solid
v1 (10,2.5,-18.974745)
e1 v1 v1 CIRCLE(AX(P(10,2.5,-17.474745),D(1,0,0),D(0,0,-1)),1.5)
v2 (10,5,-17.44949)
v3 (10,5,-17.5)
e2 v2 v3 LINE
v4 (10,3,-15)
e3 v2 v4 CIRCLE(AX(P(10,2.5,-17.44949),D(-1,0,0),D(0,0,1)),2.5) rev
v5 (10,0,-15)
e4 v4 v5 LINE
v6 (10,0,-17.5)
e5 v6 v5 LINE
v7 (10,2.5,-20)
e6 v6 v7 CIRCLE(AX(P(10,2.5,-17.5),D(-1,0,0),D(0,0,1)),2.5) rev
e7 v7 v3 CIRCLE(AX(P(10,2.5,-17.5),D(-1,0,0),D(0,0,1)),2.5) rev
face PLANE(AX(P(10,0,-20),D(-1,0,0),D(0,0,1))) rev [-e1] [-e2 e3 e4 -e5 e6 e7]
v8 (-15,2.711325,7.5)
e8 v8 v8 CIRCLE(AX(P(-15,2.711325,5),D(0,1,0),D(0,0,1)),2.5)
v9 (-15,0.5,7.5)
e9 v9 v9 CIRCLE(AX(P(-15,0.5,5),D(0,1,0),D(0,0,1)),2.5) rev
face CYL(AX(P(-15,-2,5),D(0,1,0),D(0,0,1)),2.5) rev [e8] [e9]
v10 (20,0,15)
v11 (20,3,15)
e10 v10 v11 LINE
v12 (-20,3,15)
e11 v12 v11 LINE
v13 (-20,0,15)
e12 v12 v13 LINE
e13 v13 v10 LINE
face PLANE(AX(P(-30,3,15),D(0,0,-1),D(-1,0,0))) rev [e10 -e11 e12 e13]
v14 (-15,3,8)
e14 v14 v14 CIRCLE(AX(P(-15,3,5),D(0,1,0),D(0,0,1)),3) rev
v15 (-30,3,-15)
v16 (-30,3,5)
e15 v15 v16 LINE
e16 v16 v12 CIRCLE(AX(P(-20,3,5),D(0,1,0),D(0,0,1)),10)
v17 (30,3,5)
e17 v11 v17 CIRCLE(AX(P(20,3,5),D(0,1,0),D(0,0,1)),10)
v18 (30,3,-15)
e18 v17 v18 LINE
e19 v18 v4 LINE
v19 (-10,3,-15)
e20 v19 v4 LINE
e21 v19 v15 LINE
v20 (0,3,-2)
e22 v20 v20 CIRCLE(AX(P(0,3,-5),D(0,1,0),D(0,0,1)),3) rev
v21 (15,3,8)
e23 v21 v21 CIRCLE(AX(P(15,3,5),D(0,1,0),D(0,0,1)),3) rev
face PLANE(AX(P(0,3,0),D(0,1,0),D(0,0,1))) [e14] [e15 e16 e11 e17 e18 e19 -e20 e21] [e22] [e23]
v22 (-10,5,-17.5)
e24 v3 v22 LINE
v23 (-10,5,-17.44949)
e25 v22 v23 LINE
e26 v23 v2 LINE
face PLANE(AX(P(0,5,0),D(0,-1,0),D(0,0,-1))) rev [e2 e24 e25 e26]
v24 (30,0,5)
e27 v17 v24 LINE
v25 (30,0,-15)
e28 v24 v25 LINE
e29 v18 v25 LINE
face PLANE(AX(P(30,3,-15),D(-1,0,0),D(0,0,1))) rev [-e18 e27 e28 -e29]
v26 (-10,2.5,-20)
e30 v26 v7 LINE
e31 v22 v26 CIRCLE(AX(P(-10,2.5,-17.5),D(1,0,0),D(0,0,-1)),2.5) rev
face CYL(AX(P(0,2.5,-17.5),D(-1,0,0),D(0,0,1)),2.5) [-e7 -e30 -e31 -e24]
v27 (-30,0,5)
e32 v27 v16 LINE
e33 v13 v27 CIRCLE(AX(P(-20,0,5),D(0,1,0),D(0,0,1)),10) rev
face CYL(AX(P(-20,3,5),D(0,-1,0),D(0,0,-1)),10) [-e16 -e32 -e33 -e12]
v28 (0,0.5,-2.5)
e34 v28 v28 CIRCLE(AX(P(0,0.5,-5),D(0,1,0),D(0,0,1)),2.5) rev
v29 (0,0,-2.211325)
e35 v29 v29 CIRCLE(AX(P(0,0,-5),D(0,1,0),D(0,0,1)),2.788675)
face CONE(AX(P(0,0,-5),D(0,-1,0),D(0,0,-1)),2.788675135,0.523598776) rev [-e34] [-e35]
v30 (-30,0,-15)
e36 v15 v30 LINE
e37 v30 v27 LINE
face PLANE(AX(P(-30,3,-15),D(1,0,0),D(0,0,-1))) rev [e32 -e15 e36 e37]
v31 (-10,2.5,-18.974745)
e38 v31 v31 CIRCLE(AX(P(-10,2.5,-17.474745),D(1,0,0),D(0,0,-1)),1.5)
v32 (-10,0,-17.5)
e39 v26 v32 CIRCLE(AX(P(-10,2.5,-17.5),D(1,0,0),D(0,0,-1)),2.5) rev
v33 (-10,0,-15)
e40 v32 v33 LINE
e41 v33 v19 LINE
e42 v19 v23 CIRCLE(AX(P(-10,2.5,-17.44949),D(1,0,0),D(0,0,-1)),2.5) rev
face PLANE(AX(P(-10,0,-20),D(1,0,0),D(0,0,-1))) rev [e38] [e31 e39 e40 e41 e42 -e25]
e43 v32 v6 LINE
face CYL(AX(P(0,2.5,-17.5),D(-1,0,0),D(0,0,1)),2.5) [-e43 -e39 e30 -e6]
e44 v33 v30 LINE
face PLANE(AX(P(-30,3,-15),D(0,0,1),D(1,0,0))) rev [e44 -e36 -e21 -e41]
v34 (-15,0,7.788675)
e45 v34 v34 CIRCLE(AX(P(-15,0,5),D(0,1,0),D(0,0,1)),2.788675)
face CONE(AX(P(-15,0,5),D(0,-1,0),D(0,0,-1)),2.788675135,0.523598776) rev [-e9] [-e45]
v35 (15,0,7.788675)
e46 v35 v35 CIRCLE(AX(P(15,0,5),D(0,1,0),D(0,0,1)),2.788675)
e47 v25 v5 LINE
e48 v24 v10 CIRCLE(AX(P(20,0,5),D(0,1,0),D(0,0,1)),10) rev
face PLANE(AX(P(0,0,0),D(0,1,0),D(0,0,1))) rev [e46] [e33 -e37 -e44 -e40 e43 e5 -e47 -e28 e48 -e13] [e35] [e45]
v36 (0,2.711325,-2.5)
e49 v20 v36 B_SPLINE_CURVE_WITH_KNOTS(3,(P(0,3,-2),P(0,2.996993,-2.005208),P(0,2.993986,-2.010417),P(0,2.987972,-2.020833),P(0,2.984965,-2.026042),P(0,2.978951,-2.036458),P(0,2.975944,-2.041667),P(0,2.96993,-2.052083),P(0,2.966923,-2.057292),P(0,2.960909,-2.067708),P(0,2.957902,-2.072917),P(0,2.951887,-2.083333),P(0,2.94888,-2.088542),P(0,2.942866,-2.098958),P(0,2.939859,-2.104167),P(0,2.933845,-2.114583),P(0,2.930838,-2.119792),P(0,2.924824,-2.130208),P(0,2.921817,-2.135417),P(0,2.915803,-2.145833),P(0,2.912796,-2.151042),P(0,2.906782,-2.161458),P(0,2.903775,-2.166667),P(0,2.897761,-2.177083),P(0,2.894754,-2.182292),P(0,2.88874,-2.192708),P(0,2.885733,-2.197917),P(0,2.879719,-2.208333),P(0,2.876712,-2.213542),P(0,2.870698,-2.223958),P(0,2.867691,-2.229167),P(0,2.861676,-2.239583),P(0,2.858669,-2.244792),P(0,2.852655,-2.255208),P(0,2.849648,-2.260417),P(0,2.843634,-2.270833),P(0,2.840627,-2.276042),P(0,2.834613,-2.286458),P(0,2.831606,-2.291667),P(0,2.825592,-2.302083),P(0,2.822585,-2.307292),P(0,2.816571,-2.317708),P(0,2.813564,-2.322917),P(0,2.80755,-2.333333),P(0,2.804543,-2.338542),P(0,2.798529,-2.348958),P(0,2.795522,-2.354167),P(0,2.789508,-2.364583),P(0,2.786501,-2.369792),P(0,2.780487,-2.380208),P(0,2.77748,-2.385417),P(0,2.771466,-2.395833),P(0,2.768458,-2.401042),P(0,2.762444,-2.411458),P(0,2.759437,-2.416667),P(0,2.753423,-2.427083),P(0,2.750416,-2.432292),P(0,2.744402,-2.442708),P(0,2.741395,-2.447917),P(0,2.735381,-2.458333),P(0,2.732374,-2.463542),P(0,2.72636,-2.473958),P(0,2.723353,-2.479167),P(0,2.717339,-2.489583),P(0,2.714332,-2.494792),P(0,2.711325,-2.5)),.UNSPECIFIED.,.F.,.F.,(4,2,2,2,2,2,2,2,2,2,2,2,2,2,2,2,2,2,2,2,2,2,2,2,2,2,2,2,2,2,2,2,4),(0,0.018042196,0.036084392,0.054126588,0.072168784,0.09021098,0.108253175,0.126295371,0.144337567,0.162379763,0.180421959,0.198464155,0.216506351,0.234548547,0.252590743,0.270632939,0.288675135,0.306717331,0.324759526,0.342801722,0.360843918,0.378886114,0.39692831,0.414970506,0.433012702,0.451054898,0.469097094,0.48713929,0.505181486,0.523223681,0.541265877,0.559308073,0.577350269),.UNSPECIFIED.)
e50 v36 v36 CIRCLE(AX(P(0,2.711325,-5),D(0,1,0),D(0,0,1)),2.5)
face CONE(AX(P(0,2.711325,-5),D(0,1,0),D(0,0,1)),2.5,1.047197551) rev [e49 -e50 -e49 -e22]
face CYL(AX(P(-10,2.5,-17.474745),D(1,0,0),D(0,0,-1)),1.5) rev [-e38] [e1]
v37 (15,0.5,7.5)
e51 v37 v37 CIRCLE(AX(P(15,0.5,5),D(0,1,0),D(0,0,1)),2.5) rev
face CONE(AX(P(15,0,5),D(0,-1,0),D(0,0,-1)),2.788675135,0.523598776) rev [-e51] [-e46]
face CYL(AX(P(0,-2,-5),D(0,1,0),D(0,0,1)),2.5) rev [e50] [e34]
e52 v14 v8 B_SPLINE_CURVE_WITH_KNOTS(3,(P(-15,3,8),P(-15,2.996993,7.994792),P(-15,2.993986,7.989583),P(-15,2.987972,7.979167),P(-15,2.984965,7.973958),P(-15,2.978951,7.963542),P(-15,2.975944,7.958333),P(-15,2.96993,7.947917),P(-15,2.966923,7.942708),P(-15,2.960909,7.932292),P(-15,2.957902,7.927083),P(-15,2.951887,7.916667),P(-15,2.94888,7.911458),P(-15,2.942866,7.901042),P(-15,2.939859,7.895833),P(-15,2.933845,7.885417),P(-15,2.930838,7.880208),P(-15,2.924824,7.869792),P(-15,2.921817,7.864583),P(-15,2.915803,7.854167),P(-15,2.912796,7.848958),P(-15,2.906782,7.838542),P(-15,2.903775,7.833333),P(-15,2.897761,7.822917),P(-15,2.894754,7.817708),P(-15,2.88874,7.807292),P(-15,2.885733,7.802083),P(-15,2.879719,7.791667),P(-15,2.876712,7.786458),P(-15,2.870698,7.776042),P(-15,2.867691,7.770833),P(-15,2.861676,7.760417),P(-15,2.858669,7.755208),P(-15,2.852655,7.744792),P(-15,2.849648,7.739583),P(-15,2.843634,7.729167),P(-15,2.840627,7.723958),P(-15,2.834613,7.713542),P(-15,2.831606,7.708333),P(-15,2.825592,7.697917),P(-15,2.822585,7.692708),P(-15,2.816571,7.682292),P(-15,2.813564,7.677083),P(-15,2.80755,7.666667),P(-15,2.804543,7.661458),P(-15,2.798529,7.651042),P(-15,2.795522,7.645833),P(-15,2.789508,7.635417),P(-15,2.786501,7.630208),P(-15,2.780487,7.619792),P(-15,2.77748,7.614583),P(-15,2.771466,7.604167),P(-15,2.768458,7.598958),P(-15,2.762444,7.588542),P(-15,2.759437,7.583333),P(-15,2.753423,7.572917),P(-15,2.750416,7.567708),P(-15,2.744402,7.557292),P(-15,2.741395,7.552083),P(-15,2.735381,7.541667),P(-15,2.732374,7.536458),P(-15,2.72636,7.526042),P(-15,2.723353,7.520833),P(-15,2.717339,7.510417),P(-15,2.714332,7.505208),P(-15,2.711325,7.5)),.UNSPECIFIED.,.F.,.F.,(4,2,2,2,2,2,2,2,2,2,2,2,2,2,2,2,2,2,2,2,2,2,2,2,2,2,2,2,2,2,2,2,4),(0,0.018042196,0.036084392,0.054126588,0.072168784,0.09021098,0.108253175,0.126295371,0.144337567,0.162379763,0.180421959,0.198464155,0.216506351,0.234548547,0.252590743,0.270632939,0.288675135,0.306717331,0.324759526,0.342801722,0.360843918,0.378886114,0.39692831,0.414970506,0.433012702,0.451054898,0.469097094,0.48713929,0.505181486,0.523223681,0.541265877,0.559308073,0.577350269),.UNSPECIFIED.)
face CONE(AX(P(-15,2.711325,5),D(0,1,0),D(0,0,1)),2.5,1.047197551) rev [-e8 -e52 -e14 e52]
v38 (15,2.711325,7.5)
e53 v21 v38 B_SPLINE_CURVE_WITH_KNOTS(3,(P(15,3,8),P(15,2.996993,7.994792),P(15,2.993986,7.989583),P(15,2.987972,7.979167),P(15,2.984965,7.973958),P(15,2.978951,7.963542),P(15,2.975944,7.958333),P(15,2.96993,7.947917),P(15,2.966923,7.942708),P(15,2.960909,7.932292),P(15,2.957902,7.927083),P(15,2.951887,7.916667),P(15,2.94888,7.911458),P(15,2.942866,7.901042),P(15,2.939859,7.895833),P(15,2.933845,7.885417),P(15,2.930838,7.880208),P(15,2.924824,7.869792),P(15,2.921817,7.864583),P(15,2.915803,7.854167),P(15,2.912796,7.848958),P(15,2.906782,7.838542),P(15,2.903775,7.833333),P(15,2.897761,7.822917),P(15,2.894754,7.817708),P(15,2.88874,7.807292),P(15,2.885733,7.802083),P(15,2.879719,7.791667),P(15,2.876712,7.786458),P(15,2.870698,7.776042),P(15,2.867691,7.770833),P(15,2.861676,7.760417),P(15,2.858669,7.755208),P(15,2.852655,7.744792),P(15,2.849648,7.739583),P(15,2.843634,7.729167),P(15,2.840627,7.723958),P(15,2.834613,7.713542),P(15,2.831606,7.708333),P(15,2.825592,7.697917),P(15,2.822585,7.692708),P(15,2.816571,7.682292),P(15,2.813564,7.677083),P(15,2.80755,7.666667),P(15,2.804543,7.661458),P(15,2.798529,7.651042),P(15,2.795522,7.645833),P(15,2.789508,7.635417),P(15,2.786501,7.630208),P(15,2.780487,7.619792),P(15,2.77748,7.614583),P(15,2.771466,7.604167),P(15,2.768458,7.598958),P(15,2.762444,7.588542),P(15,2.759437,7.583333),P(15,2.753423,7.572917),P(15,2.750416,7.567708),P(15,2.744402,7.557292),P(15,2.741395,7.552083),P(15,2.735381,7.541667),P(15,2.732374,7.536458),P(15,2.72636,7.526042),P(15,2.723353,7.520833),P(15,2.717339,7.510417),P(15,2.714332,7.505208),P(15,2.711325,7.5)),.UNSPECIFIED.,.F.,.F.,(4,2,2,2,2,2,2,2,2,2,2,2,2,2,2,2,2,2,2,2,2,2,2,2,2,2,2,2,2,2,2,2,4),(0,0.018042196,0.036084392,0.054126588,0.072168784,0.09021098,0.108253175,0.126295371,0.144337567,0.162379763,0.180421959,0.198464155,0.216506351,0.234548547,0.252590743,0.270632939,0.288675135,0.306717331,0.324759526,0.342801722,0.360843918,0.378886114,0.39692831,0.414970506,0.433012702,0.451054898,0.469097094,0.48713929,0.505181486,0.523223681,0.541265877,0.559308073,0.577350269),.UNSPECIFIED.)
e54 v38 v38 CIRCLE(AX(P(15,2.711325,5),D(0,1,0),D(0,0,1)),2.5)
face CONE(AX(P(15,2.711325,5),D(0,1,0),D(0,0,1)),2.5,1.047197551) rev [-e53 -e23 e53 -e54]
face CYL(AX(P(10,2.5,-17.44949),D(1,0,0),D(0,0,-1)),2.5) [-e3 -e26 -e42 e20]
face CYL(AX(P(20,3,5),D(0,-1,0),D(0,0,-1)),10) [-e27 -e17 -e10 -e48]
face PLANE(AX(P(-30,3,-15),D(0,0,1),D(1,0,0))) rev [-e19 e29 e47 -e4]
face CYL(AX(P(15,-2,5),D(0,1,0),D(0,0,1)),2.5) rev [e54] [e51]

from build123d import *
from OCP.BRepFilletAPI import BRepFilletAPI_MakeChamfer

# Parameters (mm, degrees)
SZKIC1_W                    = 60
SZKIC1_H                    = 30
DODANIE_WYCI_GNI_CIE1_DEPTH = 3
SZKIC2_R                    = 2.5
WYTNIJ_WYCI_GNI_CIE1_DEPTH  = 5
ZAOKR_GLENIE1_R             = 10
SZKIC3_W                    = 20
SZKIC3_H                    = 3
DODANIE_WYCI_GNI_CIE2_DEPTH = 5
SZKIC4_W                    = 20
SZKIC4_H                    = 5
DODANIE_WYCI_GNI_CIE3_DEPTH = 2
ZAOKR_GLENIE2_R             = 2.5
SZKIC5_R                    = 1.5
WYTNIJ_WYCI_GNI_CIE2_DEPTH  = 20
SFAZOWANIE1_SIZE            = 0.5
SFAZOWANIE1_SIZE2           = 0.288675135
SFAZOWANIE2_SIZE            = 0.5
SFAZOWANIE2_SIZE2           = 0.288675135


with BuildPart() as part:
    # Szkic1 → Dodanie-wyciągnięcie1 (new body)
    with BuildSketch(Plane(origin=(0, 0, 0), x_dir=(1, 0, 0), z_dir=(0, 1, 0))):
        Rectangle(SZKIC1_W, SZKIC1_H)
    extrude(amount=DODANIE_WYCI_GNI_CIE1_DEPTH)

    # Szkic2 → Wytnij-wyciągnięcie1 (cut)
    with BuildSketch(Plane(origin=(0, 3, 0), x_dir=(1, 0, 0), z_dir=(0, 1, 0))):
        with Locations(Location((-15, -5, 0), (0, 0, 270))):
            Circle(SZKIC2_R)
        with Locations(Location((15, -5, 0), (0, 0, 270))):
            Circle(SZKIC2_R)
        with Locations(Location((0, 5, 0), (0, 0, 270))):
            Circle(SZKIC2_R)
    extrude(amount=-WYTNIJ_WYCI_GNI_CIE1_DEPTH, mode=Mode.SUBTRACT)

    # Zaokrąglenie1
    zaokr_glenie1_edges = [part.edges().sort_by_distance(p)[0] for p in [
        (30, 1.5, 15),
        (-30, 1.5, 15),
    ]]
    fillet(zaokr_glenie1_edges, radius=ZAOKR_GLENIE1_R)

    # Szkic3 → Dodanie-wyciągnięcie2 (add)
    with BuildSketch(Plane(origin=(0, 0, -15), x_dir=(-1, 0, 0), z_dir=(0, 0, -1))):
        with Locations((0, 1.5)):
            Rectangle(SZKIC3_W, SZKIC3_H)
    extrude(amount=DODANIE_WYCI_GNI_CIE2_DEPTH)

    # Szkic4 → Dodanie-wyciągnięcie3 (add)
    with BuildSketch(Plane(origin=(0, 3, 0), x_dir=(1, 0, 0), z_dir=(0, 1, 0))):
        with Locations((0, 17.5)):
            Rectangle(SZKIC4_W, SZKIC4_H)
    extrude(amount=DODANIE_WYCI_GNI_CIE3_DEPTH)

    # Zaokrąglenie2
    # the kernel refuses this fillet: 2.5 mm, written as the material it takes off along each edge
    with BuildSketch(Plane(origin=(16.25, 0, -20), x_dir=(0, 1, 0), z_dir=(-1, 0, 0)), Plane(origin=(16.25, 5, -20), x_dir=(0, 0, 1), z_dir=(-1, 0, 0))) as zaokr_glenie2_piece_1:
        with BuildLine():
            CenterArc((ZAOKR_GLENIE2_R, -ZAOKR_GLENIE2_R), ZAOKR_GLENIE2_R, 90, 90)
            Line((0, -ZAOKR_GLENIE2_R), (-ZAOKR_GLENIE2_R * 0.02, -ZAOKR_GLENIE2_R))
            Line((-ZAOKR_GLENIE2_R * 0.02, -ZAOKR_GLENIE2_R), (-ZAOKR_GLENIE2_R * 0.02, ZAOKR_GLENIE2_R * 0.02))
            Line((-ZAOKR_GLENIE2_R * 0.02, ZAOKR_GLENIE2_R * 0.02), (ZAOKR_GLENIE2_R, ZAOKR_GLENIE2_R * 0.02))
            Line((ZAOKR_GLENIE2_R, ZAOKR_GLENIE2_R * 0.02), (ZAOKR_GLENIE2_R, 0))
        make_face()
    extrude(amount=32.5, mode=Mode.SUBTRACT)
    with BuildSketch(Plane(origin=(-16.123724357, 5, -15), x_dir=(0, -1.0, -1.666222715356868e-12), z_dir=(1, 0, 0))) as zaokr_glenie2_piece_2:
        with BuildLine():
            CenterArc((2.5, 2.449489743), ZAOKR_GLENIE2_R, 180, 78.463040967)
            Line((0, 2.449489743), (-0.05, 2.449489743))
            Line((-0.05, 2.449489743), (-0.05, 0))
            Line((-0.05, 0), (0, -0.05))
            ThreePointArc((0, -0.05), (1, -0.05), (1.99, -0.048989795))
            Line((1.99, -0.048989795), (2, 0))
        make_face()
    extrude(amount=32.247448714, mode=Mode.SUBTRACT)

    # Szkic5 → Wytnij-wyciągnięcie2 (cut)
    with BuildSketch(Plane(origin=(10, 0, 0), x_dir=(0, 0, -1), z_dir=(1, 0, 0))):
        with Locations((17.474744871, 2.5)):
            Circle(SZKIC5_R)
    extrude(amount=-WYTNIJ_WYCI_GNI_CIE2_DEPTH, mode=Mode.SUBTRACT)

    # Sfazowanie1
    sfazowanie1_edges = [part.edges().sort_by_distance(p)[0] for p in [
        (0, 3, -7.5),
    ]]
    sfazowanie1_side = [part.faces().sort_by_distance(p)[0] for p in [
        (0, 3, -0.380473171),
    ]]
    chamfer(sfazowanie1_edges, length=SFAZOWANIE1_SIZE, length2=SFAZOWANIE1_SIZE2, reference=sfazowanie1_side[0])

    # Sfazowanie2: one chamfer whose edges measure the first distance from different faces: ONE call of the kernel's chamfer builder (chamfer() names one face for all edges)
    sfazowanie2_edges_1 = [part.edges().sort_by_distance(p)[0] for p in [
        (-15, 0, 2.5),
    ]]
    sfazowanie2_side_1 = [part.faces().sort_by_distance(p)[0] for p in [
        (-15, 1.5, 2.5),
    ]]
    sfazowanie2_edges_2 = [part.edges().sort_by_distance(p)[0] for p in [
        (-15, 3, 2.5),
        (15, 3, 2.5),
    ]]
    sfazowanie2_side_2 = [part.faces().sort_by_distance(p)[0] for p in [
        (0, 3, -0.356851383),
    ]]
    sfazowanie2_edges_3 = [part.edges().sort_by_distance(p)[0] for p in [
        (15, 0, 2.5),
    ]]
    sfazowanie2_side_3 = [part.faces().sort_by_distance(p)[0] for p in [
        (15, 1.5, 2.5),
    ]]
    sfazowanie2_edges_4 = [part.edges().sort_by_distance(p)[0] for p in [
        (0, 0, -7.5),
    ]]
    sfazowanie2_side_4 = [part.faces().sort_by_distance(p)[0] for p in [
        (0, 1.355662433, -7.5),
    ]]
    sfazowanie2 = BRepFilletAPI_MakeChamfer(part.part.solid().wrapped)
    for e in sfazowanie2_edges_1:
        sfazowanie2.Add(SFAZOWANIE2_SIZE, SFAZOWANIE2_SIZE2, e.wrapped, sfazowanie2_side_1[0].wrapped)  # the first distance lies on this face
    for e in sfazowanie2_edges_2:
        sfazowanie2.Add(SFAZOWANIE2_SIZE, SFAZOWANIE2_SIZE2, e.wrapped, sfazowanie2_side_2[0].wrapped)  # the first distance lies on this face
    for e in sfazowanie2_edges_3:
        sfazowanie2.Add(SFAZOWANIE2_SIZE, SFAZOWANIE2_SIZE2, e.wrapped, sfazowanie2_side_3[0].wrapped)  # the first distance lies on this face
    for e in sfazowanie2_edges_4:
        sfazowanie2.Add(SFAZOWANIE2_SIZE, SFAZOWANIE2_SIZE2, e.wrapped, sfazowanie2_side_4[0].wrapped)  # the first distance lies on this face
    add(Compound.cast(sfazowanie2.Shape()), mode=Mode.REPLACE)


solid = part.part
